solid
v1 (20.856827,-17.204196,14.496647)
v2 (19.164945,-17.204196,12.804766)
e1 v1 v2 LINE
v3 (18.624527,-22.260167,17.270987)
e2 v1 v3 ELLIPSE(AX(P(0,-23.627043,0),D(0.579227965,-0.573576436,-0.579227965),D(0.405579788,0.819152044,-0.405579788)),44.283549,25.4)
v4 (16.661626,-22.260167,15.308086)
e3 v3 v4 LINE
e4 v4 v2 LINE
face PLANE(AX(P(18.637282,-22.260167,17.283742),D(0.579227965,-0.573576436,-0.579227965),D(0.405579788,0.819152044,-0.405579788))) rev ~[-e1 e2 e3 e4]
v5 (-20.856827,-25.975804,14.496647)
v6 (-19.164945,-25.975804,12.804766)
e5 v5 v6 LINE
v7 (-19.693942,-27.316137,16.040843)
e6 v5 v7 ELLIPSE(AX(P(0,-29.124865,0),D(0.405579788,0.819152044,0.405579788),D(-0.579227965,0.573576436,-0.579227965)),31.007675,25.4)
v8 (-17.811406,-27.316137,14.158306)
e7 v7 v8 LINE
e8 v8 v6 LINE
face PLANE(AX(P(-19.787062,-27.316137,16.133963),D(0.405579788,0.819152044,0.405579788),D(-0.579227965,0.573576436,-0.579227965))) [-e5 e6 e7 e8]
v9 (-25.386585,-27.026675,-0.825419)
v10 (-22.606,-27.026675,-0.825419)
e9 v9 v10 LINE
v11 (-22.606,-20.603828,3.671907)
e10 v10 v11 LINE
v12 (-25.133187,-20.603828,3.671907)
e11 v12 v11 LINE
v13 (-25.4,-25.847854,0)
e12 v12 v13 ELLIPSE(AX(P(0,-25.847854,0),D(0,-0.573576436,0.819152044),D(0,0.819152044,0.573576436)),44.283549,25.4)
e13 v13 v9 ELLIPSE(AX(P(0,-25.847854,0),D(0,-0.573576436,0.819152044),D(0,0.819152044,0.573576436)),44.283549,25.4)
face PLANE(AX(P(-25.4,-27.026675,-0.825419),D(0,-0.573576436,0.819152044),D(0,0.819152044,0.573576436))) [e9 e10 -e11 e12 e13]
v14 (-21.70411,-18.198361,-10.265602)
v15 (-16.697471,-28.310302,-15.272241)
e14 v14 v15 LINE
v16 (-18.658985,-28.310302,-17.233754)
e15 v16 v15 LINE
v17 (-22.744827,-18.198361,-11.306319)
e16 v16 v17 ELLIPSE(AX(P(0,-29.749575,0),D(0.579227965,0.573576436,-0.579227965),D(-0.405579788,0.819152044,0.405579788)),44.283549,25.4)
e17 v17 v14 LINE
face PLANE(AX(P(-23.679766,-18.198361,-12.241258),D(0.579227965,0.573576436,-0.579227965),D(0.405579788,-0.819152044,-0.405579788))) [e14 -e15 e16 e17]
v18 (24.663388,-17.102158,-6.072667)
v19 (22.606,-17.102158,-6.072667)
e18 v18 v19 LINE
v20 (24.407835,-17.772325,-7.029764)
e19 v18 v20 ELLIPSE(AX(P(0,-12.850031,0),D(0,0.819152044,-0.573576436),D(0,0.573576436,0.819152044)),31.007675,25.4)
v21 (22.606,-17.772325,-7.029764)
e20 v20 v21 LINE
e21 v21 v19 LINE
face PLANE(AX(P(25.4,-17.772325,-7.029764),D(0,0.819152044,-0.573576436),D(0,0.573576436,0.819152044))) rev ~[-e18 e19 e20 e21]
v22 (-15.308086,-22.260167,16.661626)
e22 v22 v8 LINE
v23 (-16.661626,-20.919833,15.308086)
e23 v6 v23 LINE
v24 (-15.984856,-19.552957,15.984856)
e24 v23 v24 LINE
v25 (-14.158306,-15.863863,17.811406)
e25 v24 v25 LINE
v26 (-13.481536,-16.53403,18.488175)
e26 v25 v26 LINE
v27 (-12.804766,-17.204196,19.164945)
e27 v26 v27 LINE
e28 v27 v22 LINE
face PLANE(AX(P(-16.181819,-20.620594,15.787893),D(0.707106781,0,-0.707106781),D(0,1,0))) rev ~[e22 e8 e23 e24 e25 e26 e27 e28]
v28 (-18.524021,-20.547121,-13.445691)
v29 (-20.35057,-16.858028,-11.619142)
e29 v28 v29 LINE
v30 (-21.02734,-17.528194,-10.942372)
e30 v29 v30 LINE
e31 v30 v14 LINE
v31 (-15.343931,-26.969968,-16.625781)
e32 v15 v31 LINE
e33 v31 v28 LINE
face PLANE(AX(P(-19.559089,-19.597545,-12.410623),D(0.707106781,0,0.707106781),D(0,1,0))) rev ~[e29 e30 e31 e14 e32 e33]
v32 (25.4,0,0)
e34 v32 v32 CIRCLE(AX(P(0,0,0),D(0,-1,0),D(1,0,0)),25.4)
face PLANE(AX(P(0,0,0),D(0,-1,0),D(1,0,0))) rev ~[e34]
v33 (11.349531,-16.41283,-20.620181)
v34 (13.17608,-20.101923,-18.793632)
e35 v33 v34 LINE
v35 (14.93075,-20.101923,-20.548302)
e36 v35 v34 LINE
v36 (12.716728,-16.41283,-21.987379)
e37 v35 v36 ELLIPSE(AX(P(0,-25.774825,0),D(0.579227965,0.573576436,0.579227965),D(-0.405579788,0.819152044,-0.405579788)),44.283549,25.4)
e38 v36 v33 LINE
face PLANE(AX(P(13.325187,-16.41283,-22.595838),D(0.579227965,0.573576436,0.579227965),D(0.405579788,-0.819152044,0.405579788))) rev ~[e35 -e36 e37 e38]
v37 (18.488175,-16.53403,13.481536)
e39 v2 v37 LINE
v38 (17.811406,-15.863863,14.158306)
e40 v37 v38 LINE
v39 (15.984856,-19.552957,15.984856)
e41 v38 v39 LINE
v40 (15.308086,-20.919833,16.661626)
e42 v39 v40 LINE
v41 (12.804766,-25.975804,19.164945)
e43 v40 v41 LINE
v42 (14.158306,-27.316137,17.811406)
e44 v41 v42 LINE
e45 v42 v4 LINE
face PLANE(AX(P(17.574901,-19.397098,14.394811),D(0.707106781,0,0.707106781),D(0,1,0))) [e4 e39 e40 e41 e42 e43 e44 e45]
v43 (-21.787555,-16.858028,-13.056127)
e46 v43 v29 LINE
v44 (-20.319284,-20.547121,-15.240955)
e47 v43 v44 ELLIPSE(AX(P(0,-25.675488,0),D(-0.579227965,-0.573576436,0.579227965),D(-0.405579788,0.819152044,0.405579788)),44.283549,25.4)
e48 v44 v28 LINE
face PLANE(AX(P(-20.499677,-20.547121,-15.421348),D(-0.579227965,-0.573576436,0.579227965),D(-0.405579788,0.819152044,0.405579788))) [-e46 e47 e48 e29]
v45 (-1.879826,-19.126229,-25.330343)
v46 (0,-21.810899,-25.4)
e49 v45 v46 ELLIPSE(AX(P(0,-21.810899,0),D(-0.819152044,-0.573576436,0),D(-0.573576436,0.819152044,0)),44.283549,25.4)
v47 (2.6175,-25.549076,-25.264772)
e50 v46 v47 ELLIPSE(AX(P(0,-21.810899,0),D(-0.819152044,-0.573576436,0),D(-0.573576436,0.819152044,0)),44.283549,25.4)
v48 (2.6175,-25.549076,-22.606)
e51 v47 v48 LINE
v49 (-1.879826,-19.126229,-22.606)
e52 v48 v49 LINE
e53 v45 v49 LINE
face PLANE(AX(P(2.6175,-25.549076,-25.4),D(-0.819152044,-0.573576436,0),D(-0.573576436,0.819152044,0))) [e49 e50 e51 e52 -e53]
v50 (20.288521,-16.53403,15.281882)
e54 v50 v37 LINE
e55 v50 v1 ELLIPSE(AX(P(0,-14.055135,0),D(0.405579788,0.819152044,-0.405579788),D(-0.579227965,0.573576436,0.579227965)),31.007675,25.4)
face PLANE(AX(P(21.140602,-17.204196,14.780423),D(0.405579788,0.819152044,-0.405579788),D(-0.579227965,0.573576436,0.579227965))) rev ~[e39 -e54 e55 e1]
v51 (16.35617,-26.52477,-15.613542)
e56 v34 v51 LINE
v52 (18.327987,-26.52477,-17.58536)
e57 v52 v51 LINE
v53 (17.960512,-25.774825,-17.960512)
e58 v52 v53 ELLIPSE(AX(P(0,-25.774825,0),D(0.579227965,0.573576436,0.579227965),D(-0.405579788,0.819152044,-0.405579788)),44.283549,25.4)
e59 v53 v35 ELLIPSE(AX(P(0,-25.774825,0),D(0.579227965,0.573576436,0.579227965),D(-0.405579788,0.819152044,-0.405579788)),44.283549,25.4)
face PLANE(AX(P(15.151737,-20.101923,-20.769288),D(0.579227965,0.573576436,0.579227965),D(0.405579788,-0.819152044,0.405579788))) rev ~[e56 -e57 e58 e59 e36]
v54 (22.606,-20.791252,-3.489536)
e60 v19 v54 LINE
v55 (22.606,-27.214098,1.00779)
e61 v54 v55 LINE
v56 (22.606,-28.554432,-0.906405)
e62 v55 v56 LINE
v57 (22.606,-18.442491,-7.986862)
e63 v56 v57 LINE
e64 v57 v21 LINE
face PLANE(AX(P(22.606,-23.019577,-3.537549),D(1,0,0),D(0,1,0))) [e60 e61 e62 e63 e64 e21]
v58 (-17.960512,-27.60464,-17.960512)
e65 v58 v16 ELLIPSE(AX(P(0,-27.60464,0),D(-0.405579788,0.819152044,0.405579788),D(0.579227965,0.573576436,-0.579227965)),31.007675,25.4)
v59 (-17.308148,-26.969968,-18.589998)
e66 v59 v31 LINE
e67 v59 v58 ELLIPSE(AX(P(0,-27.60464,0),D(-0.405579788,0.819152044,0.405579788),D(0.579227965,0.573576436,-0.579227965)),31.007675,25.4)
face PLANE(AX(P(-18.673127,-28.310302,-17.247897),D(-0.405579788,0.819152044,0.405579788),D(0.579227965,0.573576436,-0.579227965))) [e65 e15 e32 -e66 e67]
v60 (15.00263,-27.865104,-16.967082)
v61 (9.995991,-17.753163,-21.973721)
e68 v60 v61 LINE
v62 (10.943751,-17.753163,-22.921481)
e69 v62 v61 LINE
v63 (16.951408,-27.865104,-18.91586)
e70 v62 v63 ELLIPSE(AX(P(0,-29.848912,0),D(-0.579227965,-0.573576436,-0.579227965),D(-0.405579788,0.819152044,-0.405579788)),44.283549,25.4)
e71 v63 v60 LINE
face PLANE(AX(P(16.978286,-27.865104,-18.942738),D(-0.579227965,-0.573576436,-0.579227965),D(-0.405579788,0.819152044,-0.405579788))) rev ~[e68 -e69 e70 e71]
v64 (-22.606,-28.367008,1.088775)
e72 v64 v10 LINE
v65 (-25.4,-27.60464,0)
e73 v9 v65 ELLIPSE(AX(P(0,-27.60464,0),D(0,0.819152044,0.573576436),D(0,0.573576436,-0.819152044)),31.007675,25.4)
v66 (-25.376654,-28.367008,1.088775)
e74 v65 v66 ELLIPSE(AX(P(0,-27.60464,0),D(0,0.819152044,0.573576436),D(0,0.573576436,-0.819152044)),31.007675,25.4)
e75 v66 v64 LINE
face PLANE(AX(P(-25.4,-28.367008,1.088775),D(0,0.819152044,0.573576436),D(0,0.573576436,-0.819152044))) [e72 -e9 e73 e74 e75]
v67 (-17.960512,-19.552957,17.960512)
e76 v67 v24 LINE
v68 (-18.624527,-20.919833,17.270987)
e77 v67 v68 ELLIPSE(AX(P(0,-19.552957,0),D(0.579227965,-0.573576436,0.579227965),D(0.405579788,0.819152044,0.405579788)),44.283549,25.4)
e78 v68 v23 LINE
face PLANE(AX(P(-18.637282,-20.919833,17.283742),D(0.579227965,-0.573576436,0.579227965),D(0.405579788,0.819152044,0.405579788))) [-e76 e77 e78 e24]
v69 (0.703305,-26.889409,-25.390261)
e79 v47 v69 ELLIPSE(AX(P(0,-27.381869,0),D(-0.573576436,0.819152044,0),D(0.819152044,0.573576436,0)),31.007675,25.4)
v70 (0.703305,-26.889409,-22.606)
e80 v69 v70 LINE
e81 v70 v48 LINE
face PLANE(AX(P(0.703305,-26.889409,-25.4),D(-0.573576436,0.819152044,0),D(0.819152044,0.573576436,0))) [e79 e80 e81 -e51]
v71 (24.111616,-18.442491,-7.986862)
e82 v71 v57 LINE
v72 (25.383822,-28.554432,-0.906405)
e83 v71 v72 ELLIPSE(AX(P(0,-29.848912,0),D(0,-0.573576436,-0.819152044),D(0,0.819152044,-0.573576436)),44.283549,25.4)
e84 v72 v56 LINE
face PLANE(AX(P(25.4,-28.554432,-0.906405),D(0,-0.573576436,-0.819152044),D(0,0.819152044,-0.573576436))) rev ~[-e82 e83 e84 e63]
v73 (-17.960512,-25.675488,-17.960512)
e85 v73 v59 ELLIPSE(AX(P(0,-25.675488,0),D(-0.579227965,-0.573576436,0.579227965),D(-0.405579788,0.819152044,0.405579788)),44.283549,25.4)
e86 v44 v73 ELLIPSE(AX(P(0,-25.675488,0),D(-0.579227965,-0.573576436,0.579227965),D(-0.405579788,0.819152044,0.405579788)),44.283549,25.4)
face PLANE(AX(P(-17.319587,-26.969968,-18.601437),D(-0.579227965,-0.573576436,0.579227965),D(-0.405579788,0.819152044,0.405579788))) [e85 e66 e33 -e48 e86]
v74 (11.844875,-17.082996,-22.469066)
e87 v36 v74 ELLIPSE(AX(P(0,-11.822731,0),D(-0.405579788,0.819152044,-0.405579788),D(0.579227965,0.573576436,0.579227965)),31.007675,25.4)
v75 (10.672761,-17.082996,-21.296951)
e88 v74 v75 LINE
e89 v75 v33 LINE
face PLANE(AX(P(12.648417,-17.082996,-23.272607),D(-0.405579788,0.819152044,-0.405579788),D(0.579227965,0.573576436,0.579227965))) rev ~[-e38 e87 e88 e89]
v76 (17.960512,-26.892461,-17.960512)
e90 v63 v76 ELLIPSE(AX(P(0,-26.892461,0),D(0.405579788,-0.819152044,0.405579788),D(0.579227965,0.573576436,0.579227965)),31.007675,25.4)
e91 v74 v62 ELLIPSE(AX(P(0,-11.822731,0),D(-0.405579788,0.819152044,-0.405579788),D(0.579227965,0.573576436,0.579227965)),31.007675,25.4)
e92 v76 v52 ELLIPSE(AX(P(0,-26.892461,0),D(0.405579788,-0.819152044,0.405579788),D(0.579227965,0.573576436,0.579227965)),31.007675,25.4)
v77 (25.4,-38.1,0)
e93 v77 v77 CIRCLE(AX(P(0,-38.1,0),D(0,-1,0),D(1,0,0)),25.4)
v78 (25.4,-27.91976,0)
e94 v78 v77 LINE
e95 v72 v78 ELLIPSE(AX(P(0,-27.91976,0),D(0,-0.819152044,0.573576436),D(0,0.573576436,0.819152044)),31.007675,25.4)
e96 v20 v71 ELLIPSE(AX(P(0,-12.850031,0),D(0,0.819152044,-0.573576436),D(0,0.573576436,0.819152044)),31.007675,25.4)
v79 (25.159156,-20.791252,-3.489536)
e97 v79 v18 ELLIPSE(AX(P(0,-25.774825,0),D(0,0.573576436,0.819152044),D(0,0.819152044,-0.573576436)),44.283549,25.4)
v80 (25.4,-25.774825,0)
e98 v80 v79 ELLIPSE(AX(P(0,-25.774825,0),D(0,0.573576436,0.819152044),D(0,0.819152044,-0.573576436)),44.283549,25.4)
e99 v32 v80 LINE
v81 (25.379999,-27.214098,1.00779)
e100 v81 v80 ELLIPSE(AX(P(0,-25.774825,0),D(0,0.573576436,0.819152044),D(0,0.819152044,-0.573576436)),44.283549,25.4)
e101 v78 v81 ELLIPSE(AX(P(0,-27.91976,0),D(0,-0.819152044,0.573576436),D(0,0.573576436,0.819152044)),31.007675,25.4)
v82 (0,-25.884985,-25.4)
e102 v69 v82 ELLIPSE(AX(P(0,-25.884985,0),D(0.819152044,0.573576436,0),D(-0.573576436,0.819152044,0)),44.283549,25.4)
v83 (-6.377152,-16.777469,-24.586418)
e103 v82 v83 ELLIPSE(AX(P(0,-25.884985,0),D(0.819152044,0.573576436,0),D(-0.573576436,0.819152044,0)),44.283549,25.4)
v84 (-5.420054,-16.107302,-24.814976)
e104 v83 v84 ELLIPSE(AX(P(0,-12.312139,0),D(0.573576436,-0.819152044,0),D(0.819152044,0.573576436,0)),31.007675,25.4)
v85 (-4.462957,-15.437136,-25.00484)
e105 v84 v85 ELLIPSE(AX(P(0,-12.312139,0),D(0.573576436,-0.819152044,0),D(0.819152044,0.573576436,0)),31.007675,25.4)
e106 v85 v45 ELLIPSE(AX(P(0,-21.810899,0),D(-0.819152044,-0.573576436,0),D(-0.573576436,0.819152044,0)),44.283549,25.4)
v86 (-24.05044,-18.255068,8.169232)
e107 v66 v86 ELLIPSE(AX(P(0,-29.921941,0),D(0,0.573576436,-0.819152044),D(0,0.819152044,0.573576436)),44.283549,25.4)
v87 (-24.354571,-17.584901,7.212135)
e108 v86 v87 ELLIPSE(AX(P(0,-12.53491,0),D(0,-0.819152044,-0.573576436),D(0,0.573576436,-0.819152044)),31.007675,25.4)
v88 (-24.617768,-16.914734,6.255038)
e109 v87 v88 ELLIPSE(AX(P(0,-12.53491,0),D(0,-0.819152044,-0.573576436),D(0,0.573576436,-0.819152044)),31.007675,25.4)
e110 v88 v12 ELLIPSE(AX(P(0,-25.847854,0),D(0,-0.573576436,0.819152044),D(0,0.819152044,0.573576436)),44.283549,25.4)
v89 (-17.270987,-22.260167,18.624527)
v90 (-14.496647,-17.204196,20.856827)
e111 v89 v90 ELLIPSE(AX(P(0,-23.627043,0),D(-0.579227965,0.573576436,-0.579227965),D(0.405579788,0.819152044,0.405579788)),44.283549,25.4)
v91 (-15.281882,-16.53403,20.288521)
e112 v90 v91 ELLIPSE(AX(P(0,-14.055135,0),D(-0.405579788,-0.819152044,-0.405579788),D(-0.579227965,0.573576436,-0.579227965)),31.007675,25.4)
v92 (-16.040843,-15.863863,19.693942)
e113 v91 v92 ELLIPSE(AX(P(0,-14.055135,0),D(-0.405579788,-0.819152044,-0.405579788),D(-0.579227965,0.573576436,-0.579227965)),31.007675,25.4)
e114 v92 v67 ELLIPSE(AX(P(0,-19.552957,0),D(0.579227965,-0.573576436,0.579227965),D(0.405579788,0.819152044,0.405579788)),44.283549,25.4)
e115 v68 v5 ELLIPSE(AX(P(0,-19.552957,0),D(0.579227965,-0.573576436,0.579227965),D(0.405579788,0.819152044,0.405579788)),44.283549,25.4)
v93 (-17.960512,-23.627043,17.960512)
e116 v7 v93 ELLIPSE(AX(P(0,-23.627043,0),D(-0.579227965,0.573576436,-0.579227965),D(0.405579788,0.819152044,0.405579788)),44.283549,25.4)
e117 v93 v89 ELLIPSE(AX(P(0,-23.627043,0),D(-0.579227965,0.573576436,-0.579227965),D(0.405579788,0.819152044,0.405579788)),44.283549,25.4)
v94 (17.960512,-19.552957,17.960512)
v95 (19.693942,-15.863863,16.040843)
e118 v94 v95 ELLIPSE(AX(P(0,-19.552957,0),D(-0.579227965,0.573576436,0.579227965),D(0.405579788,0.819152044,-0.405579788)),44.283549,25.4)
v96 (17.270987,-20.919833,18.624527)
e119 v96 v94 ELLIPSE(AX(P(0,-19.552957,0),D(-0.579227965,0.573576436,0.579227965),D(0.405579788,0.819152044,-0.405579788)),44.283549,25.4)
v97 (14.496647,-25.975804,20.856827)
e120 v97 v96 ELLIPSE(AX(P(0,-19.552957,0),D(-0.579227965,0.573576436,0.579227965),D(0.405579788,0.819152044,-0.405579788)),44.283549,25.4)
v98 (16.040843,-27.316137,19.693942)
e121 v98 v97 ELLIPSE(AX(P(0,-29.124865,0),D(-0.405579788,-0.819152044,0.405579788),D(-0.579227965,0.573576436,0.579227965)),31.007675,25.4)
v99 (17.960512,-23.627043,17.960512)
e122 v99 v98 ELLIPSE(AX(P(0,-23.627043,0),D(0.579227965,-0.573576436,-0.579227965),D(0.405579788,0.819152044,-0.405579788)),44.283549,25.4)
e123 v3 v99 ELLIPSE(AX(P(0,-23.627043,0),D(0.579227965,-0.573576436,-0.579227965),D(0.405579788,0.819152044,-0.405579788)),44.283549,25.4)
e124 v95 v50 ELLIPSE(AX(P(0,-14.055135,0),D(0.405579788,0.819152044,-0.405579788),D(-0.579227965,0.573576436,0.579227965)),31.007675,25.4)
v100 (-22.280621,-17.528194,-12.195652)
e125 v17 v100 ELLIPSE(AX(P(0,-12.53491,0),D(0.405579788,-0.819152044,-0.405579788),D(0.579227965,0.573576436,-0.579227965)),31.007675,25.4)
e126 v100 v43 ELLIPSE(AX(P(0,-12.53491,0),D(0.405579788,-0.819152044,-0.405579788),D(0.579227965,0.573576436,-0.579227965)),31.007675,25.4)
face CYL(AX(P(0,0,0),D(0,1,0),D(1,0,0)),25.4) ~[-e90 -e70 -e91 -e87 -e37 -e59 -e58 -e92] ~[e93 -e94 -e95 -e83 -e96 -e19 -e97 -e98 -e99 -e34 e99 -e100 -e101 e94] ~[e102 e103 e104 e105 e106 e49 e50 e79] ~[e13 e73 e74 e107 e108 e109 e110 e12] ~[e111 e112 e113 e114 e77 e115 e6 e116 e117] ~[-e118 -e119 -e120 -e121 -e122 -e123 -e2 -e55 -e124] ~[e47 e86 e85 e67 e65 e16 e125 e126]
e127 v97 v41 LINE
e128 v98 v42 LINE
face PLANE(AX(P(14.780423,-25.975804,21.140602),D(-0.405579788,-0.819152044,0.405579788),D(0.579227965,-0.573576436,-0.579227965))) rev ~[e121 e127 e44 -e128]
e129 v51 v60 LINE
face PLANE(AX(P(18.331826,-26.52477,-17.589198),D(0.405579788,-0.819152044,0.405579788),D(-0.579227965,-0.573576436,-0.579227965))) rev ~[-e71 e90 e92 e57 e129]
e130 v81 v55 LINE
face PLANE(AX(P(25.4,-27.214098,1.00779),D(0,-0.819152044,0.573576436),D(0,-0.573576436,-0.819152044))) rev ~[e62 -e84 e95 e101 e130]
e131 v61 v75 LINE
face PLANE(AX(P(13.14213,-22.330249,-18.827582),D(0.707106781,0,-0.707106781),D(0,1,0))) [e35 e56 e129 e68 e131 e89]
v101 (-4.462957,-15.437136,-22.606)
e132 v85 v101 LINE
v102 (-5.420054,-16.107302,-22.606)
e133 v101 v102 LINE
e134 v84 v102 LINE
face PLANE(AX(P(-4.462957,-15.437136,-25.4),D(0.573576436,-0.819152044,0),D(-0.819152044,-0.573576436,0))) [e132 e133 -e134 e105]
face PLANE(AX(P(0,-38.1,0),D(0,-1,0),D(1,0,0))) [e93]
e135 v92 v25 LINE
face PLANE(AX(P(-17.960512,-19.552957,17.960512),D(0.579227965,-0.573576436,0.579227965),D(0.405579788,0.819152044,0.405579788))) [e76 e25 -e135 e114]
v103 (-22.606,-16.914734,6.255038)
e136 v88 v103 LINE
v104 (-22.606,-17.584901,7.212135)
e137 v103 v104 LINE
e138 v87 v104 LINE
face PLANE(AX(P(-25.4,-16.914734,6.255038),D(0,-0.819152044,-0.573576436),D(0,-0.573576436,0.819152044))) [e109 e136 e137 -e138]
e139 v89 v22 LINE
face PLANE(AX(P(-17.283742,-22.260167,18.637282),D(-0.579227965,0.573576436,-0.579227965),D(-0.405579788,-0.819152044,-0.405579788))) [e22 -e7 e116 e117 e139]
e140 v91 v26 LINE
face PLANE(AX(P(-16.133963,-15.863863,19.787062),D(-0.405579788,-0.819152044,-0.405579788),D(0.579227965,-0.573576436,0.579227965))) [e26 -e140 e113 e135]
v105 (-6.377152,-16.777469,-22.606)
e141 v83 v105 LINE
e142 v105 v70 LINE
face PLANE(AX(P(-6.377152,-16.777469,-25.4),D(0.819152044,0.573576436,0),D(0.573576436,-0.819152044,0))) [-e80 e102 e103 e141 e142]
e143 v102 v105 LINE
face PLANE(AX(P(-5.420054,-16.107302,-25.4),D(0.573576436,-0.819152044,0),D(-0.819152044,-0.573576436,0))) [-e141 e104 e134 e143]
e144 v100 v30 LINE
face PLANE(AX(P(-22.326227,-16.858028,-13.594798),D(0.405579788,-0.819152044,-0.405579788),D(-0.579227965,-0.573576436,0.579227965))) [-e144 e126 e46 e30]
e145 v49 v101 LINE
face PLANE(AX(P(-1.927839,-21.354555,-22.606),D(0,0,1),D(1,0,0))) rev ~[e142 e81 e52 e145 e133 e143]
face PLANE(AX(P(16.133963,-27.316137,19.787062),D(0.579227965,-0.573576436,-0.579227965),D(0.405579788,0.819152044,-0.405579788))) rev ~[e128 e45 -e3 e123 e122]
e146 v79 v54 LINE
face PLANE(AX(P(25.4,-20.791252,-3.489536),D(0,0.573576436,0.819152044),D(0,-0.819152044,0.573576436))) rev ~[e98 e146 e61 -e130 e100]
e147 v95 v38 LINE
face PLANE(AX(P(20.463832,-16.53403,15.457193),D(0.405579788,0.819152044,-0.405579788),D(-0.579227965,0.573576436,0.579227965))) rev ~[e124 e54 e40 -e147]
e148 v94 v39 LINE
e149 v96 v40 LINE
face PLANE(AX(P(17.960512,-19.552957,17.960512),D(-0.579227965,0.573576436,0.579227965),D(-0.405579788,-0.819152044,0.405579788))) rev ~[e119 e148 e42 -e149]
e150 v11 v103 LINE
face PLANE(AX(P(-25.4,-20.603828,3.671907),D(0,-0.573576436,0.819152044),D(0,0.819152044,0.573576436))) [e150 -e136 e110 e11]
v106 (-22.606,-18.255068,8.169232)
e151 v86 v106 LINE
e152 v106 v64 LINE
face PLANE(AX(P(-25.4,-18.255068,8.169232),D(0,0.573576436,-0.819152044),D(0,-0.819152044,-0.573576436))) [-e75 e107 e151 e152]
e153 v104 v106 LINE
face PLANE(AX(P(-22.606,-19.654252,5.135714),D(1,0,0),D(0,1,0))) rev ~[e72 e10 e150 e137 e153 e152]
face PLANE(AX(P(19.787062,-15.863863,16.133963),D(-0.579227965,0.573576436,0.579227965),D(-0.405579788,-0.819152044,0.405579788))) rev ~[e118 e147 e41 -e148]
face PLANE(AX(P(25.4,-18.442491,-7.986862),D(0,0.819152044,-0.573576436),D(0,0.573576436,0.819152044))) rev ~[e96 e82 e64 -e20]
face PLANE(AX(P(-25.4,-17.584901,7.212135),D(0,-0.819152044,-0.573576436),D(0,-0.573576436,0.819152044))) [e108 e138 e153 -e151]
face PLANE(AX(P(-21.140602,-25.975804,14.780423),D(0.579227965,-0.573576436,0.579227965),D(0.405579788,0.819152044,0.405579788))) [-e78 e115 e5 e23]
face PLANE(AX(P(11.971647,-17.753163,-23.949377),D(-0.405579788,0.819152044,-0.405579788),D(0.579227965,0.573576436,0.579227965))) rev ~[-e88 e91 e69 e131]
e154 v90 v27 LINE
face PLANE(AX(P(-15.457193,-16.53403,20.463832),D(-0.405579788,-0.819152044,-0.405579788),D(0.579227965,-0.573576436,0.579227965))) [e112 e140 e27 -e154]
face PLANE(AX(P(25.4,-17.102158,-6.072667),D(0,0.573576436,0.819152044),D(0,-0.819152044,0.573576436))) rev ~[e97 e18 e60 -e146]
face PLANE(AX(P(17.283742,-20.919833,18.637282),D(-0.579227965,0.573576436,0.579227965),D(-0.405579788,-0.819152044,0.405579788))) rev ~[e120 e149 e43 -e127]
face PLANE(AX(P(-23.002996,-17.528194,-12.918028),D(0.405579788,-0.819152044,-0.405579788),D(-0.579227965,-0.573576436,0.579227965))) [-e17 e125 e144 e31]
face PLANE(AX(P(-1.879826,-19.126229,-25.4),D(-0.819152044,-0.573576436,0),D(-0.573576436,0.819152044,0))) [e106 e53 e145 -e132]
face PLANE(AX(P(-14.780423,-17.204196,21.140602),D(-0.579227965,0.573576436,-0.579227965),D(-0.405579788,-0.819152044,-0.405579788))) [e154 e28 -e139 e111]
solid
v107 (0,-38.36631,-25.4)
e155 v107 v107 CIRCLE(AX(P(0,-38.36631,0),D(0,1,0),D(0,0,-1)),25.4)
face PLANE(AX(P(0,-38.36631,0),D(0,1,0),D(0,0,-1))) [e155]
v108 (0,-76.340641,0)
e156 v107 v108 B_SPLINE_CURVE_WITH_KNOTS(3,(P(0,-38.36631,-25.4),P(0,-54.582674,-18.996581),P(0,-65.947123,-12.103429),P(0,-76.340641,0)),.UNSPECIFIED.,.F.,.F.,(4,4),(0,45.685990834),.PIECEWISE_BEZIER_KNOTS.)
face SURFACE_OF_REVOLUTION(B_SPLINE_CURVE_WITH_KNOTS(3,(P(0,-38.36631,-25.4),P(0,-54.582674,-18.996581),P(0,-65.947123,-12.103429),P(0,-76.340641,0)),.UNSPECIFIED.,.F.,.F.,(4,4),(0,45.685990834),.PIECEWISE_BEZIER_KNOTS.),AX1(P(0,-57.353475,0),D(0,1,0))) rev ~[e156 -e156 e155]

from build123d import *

# Parameters (mm, degrees)
F0_R      = 25.4
F1_DEPTH  = 38.1
F21_DEPTH = 2.794
F22_DEPTH = 2.794
F23_DEPTH = 2.794
F24_DEPTH = 2.794
F25_DEPTH = 2.794
F26_DEPTH = 2.794
F27_DEPTH = 2.794


with BuildPart() as f1:
    # F0 (on Front) → F1 (new body)
    with BuildSketch(Plane.XZ):
        Circle(F0_R)
    extrude(amount=F1_DEPTH)

    # F14 (on face) → F21 (cut)
    with BuildSketch(Plane(origin=(17.9605122421, 0, 17.9605122421), x_dir=(0, 1, 0), z_dir=(0.7071067812, 0, 0.7071067812))):
        Polygon((-22.2601667082, -0.9570972485), (-17.2041964605, -4.497325729), (-16.5340297522, -3.5402284804), (-21.59, 0), align=None)
        Polygon((-27.316136956, 2.5831312319), (-22.2601667082, -0.9570972485), (-21.59, 0), (-20.9198332918, 0.9570972485), (-25.9758035395, 4.497325729), align=None)
        Polygon((-21.59, 0), (-16.5340297522, -3.5402284804), (-15.863863044, -2.5831312319), (-19.552956764, 0), align=None)
        Polygon((-20.9198332918, 0.9570972485), (-21.59, 0), (-19.552956764, 0), align=None)
    extrude(amount=-F21_DEPTH, mode=Mode.SUBTRACT)

    # F20 (on offset) → F22 (cut)
    with BuildSketch(Plane.YZ.offset(25.4)):
        Polygon((-28.5544317948, -0.9064046195), (-18.4424912993, -7.9868615804), (-17.772324591, -7.0297643319), (-22.8282948388, -3.4895358514), (-21.4186995436, -3.4895358514), (-20.7912516028, -3.4895358514), (-27.2140983783, 1.0077898775), align=None)
        Polygon((-22.8282948388, -3.4895358514), (-17.772324591, -7.0297643319), (-17.1021578828, -6.0726670833), (-20.7912516028, -3.4895358514), (-21.4186995436, -3.4895358514), align=None)
    extrude(amount=-F22_DEPTH, mode=Mode.SUBTRACT)

    # F19 (on face) → F23 (cut)
    with BuildSketch(Plane(origin=(17.9605122421, 0, -17.9605122421), x_dir=(0, 1, 0), z_dir=(0.7071067812, 0, -0.7071067812))):
        Polygon((-27.8651035773, -1.3890774337), (-17.7531630818, -8.4695343946), (-17.0829963736, -7.5124371461), (-22.1389666213, -3.9722086656), (-20.1019233853, -3.9722086656), (-26.5247701609, 0.5251170634), align=None)
        Polygon((-22.1389666213, -3.9722086656), (-17.0829963736, -7.5124371461), (-16.4128296653, -6.5553398975), (-20.1019233853, -3.9722086656), align=None)
    extrude(amount=-F23_DEPTH, mode=Mode.SUBTRACT)

    # F18 (on offset) → F24 (cut)
    with BuildSketch(Plane.XY.offset(-25.4)):
        Polygon((-6.3771515661, -16.7774689451), (0.7033053948, -26.8894094406), (2.6174998919, -25.5490760241), (-1.8798258371, -19.1262292486), (-1.8798258371, -21.1632724846), (-5.4200543175, -16.1073022368), align=None)
        Polygon((-4.462957069, -15.4371355286), (-5.4200543175, -16.1073022368), (-1.8798258371, -21.1632724846), (-1.8798258371, -19.1262292486), align=None)
    extrude(amount=F24_DEPTH, mode=Mode.SUBTRACT)

    # F17 (on face) → F25 (cut)
    with BuildSketch(Plane(origin=(-17.9605122421, 0, -17.9605122421), x_dir=(0, 1, 0), z_dir=(0.7071067812, 0, 0.7071067812))):
        Polygon((-20.5471214297, 3.5909211094), (-16.8580277097, 6.1740523413), (-17.5281944179, 7.1311495899), (-22.5841646657, 3.5909211094), align=None)
        Polygon((-26.9699682052, -0.9064046195), (-20.5471214297, 3.5909211094), (-22.5841646657, 3.5909211094), (-17.5281944179, 7.1311495899), (-18.1983611261, 8.0882468384), (-28.3103016217, 1.0077898775), align=None)
    extrude(amount=F25_DEPTH, mode=Mode.SUBTRACT)

    # F16 (on offset) → F26 (cut)
    with BuildSketch(Plane.YZ.offset(-25.4)):
        Polygon((-20.6038281526, 3.6719067028), (-16.9147344326, 6.2550379347), (-17.5849011408, 7.2121351832), (-22.6408713886, 3.6719067028), align=None)
        Polygon((-27.0266749281, -0.8254190262), (-20.6038281526, 3.6719067028), (-22.6408713886, 3.6719067028), (-17.5849011408, 7.2121351832), (-18.2550678491, 8.1692324318), (-28.3670083446, 1.0887754709), align=None)
    extrude(amount=F26_DEPTH, mode=Mode.SUBTRACT)

    # F15 (on face) → F27 (cut)
    with BuildSketch(Plane(origin=(-17.9605122421, 0, 17.9605122421), x_dir=(0, 1, 0), z_dir=(0.7071067812, 0, -0.7071067812))):
        Polygon((-21.59, 0), (-20.9198332918, -0.9570972485), (-19.552956764, 0), align=None)
        Polygon((-25.9758035395, -4.497325729), (-20.9198332918, -0.9570972485), (-21.59, 0), (-22.2601667082, 0.9570972485), (-27.316136956, -2.5831312319), align=None)
        Polygon((-21.59, 0), (-19.552956764, 0), (-15.863863044, 2.5831312319), (-16.5340297522, 3.5402284804), align=None)
        Polygon((-22.2601667082, 0.9570972485), (-21.59, 0), (-16.5340297522, 3.5402284804), (-17.2041964605, 4.497325729), align=None)
    extrude(amount=F27_DEPTH, mode=Mode.SUBTRACT)


with BuildPart() as f3:
    # F2 (on Right) → F3 (revolve)
    with BuildSketch(Plane.YZ):
        with BuildLine():
            Line((-38.3663102984, 0), (-76.3406405559, 0))
            add(Edge.make_bspline(
                [(-38.3663102984, -25.4), (-54.5826740563, -18.9965814352), (-65.9471228719, -12.1034290642), (-76.3406405559, 0)],
                knots=[0, 0, 0, 0, 45.6859908342, 45.6859908342, 45.6859908342, 45.6859908342], degree=3))
            Line((-38.3663102984, -25.4), (-38.3663102984, 0))
        make_face()
    revolve(axis=Axis((0, -57.3534754272, 0), (0, 1, 0)))


solid = Compound([f1.part, f3.part])
